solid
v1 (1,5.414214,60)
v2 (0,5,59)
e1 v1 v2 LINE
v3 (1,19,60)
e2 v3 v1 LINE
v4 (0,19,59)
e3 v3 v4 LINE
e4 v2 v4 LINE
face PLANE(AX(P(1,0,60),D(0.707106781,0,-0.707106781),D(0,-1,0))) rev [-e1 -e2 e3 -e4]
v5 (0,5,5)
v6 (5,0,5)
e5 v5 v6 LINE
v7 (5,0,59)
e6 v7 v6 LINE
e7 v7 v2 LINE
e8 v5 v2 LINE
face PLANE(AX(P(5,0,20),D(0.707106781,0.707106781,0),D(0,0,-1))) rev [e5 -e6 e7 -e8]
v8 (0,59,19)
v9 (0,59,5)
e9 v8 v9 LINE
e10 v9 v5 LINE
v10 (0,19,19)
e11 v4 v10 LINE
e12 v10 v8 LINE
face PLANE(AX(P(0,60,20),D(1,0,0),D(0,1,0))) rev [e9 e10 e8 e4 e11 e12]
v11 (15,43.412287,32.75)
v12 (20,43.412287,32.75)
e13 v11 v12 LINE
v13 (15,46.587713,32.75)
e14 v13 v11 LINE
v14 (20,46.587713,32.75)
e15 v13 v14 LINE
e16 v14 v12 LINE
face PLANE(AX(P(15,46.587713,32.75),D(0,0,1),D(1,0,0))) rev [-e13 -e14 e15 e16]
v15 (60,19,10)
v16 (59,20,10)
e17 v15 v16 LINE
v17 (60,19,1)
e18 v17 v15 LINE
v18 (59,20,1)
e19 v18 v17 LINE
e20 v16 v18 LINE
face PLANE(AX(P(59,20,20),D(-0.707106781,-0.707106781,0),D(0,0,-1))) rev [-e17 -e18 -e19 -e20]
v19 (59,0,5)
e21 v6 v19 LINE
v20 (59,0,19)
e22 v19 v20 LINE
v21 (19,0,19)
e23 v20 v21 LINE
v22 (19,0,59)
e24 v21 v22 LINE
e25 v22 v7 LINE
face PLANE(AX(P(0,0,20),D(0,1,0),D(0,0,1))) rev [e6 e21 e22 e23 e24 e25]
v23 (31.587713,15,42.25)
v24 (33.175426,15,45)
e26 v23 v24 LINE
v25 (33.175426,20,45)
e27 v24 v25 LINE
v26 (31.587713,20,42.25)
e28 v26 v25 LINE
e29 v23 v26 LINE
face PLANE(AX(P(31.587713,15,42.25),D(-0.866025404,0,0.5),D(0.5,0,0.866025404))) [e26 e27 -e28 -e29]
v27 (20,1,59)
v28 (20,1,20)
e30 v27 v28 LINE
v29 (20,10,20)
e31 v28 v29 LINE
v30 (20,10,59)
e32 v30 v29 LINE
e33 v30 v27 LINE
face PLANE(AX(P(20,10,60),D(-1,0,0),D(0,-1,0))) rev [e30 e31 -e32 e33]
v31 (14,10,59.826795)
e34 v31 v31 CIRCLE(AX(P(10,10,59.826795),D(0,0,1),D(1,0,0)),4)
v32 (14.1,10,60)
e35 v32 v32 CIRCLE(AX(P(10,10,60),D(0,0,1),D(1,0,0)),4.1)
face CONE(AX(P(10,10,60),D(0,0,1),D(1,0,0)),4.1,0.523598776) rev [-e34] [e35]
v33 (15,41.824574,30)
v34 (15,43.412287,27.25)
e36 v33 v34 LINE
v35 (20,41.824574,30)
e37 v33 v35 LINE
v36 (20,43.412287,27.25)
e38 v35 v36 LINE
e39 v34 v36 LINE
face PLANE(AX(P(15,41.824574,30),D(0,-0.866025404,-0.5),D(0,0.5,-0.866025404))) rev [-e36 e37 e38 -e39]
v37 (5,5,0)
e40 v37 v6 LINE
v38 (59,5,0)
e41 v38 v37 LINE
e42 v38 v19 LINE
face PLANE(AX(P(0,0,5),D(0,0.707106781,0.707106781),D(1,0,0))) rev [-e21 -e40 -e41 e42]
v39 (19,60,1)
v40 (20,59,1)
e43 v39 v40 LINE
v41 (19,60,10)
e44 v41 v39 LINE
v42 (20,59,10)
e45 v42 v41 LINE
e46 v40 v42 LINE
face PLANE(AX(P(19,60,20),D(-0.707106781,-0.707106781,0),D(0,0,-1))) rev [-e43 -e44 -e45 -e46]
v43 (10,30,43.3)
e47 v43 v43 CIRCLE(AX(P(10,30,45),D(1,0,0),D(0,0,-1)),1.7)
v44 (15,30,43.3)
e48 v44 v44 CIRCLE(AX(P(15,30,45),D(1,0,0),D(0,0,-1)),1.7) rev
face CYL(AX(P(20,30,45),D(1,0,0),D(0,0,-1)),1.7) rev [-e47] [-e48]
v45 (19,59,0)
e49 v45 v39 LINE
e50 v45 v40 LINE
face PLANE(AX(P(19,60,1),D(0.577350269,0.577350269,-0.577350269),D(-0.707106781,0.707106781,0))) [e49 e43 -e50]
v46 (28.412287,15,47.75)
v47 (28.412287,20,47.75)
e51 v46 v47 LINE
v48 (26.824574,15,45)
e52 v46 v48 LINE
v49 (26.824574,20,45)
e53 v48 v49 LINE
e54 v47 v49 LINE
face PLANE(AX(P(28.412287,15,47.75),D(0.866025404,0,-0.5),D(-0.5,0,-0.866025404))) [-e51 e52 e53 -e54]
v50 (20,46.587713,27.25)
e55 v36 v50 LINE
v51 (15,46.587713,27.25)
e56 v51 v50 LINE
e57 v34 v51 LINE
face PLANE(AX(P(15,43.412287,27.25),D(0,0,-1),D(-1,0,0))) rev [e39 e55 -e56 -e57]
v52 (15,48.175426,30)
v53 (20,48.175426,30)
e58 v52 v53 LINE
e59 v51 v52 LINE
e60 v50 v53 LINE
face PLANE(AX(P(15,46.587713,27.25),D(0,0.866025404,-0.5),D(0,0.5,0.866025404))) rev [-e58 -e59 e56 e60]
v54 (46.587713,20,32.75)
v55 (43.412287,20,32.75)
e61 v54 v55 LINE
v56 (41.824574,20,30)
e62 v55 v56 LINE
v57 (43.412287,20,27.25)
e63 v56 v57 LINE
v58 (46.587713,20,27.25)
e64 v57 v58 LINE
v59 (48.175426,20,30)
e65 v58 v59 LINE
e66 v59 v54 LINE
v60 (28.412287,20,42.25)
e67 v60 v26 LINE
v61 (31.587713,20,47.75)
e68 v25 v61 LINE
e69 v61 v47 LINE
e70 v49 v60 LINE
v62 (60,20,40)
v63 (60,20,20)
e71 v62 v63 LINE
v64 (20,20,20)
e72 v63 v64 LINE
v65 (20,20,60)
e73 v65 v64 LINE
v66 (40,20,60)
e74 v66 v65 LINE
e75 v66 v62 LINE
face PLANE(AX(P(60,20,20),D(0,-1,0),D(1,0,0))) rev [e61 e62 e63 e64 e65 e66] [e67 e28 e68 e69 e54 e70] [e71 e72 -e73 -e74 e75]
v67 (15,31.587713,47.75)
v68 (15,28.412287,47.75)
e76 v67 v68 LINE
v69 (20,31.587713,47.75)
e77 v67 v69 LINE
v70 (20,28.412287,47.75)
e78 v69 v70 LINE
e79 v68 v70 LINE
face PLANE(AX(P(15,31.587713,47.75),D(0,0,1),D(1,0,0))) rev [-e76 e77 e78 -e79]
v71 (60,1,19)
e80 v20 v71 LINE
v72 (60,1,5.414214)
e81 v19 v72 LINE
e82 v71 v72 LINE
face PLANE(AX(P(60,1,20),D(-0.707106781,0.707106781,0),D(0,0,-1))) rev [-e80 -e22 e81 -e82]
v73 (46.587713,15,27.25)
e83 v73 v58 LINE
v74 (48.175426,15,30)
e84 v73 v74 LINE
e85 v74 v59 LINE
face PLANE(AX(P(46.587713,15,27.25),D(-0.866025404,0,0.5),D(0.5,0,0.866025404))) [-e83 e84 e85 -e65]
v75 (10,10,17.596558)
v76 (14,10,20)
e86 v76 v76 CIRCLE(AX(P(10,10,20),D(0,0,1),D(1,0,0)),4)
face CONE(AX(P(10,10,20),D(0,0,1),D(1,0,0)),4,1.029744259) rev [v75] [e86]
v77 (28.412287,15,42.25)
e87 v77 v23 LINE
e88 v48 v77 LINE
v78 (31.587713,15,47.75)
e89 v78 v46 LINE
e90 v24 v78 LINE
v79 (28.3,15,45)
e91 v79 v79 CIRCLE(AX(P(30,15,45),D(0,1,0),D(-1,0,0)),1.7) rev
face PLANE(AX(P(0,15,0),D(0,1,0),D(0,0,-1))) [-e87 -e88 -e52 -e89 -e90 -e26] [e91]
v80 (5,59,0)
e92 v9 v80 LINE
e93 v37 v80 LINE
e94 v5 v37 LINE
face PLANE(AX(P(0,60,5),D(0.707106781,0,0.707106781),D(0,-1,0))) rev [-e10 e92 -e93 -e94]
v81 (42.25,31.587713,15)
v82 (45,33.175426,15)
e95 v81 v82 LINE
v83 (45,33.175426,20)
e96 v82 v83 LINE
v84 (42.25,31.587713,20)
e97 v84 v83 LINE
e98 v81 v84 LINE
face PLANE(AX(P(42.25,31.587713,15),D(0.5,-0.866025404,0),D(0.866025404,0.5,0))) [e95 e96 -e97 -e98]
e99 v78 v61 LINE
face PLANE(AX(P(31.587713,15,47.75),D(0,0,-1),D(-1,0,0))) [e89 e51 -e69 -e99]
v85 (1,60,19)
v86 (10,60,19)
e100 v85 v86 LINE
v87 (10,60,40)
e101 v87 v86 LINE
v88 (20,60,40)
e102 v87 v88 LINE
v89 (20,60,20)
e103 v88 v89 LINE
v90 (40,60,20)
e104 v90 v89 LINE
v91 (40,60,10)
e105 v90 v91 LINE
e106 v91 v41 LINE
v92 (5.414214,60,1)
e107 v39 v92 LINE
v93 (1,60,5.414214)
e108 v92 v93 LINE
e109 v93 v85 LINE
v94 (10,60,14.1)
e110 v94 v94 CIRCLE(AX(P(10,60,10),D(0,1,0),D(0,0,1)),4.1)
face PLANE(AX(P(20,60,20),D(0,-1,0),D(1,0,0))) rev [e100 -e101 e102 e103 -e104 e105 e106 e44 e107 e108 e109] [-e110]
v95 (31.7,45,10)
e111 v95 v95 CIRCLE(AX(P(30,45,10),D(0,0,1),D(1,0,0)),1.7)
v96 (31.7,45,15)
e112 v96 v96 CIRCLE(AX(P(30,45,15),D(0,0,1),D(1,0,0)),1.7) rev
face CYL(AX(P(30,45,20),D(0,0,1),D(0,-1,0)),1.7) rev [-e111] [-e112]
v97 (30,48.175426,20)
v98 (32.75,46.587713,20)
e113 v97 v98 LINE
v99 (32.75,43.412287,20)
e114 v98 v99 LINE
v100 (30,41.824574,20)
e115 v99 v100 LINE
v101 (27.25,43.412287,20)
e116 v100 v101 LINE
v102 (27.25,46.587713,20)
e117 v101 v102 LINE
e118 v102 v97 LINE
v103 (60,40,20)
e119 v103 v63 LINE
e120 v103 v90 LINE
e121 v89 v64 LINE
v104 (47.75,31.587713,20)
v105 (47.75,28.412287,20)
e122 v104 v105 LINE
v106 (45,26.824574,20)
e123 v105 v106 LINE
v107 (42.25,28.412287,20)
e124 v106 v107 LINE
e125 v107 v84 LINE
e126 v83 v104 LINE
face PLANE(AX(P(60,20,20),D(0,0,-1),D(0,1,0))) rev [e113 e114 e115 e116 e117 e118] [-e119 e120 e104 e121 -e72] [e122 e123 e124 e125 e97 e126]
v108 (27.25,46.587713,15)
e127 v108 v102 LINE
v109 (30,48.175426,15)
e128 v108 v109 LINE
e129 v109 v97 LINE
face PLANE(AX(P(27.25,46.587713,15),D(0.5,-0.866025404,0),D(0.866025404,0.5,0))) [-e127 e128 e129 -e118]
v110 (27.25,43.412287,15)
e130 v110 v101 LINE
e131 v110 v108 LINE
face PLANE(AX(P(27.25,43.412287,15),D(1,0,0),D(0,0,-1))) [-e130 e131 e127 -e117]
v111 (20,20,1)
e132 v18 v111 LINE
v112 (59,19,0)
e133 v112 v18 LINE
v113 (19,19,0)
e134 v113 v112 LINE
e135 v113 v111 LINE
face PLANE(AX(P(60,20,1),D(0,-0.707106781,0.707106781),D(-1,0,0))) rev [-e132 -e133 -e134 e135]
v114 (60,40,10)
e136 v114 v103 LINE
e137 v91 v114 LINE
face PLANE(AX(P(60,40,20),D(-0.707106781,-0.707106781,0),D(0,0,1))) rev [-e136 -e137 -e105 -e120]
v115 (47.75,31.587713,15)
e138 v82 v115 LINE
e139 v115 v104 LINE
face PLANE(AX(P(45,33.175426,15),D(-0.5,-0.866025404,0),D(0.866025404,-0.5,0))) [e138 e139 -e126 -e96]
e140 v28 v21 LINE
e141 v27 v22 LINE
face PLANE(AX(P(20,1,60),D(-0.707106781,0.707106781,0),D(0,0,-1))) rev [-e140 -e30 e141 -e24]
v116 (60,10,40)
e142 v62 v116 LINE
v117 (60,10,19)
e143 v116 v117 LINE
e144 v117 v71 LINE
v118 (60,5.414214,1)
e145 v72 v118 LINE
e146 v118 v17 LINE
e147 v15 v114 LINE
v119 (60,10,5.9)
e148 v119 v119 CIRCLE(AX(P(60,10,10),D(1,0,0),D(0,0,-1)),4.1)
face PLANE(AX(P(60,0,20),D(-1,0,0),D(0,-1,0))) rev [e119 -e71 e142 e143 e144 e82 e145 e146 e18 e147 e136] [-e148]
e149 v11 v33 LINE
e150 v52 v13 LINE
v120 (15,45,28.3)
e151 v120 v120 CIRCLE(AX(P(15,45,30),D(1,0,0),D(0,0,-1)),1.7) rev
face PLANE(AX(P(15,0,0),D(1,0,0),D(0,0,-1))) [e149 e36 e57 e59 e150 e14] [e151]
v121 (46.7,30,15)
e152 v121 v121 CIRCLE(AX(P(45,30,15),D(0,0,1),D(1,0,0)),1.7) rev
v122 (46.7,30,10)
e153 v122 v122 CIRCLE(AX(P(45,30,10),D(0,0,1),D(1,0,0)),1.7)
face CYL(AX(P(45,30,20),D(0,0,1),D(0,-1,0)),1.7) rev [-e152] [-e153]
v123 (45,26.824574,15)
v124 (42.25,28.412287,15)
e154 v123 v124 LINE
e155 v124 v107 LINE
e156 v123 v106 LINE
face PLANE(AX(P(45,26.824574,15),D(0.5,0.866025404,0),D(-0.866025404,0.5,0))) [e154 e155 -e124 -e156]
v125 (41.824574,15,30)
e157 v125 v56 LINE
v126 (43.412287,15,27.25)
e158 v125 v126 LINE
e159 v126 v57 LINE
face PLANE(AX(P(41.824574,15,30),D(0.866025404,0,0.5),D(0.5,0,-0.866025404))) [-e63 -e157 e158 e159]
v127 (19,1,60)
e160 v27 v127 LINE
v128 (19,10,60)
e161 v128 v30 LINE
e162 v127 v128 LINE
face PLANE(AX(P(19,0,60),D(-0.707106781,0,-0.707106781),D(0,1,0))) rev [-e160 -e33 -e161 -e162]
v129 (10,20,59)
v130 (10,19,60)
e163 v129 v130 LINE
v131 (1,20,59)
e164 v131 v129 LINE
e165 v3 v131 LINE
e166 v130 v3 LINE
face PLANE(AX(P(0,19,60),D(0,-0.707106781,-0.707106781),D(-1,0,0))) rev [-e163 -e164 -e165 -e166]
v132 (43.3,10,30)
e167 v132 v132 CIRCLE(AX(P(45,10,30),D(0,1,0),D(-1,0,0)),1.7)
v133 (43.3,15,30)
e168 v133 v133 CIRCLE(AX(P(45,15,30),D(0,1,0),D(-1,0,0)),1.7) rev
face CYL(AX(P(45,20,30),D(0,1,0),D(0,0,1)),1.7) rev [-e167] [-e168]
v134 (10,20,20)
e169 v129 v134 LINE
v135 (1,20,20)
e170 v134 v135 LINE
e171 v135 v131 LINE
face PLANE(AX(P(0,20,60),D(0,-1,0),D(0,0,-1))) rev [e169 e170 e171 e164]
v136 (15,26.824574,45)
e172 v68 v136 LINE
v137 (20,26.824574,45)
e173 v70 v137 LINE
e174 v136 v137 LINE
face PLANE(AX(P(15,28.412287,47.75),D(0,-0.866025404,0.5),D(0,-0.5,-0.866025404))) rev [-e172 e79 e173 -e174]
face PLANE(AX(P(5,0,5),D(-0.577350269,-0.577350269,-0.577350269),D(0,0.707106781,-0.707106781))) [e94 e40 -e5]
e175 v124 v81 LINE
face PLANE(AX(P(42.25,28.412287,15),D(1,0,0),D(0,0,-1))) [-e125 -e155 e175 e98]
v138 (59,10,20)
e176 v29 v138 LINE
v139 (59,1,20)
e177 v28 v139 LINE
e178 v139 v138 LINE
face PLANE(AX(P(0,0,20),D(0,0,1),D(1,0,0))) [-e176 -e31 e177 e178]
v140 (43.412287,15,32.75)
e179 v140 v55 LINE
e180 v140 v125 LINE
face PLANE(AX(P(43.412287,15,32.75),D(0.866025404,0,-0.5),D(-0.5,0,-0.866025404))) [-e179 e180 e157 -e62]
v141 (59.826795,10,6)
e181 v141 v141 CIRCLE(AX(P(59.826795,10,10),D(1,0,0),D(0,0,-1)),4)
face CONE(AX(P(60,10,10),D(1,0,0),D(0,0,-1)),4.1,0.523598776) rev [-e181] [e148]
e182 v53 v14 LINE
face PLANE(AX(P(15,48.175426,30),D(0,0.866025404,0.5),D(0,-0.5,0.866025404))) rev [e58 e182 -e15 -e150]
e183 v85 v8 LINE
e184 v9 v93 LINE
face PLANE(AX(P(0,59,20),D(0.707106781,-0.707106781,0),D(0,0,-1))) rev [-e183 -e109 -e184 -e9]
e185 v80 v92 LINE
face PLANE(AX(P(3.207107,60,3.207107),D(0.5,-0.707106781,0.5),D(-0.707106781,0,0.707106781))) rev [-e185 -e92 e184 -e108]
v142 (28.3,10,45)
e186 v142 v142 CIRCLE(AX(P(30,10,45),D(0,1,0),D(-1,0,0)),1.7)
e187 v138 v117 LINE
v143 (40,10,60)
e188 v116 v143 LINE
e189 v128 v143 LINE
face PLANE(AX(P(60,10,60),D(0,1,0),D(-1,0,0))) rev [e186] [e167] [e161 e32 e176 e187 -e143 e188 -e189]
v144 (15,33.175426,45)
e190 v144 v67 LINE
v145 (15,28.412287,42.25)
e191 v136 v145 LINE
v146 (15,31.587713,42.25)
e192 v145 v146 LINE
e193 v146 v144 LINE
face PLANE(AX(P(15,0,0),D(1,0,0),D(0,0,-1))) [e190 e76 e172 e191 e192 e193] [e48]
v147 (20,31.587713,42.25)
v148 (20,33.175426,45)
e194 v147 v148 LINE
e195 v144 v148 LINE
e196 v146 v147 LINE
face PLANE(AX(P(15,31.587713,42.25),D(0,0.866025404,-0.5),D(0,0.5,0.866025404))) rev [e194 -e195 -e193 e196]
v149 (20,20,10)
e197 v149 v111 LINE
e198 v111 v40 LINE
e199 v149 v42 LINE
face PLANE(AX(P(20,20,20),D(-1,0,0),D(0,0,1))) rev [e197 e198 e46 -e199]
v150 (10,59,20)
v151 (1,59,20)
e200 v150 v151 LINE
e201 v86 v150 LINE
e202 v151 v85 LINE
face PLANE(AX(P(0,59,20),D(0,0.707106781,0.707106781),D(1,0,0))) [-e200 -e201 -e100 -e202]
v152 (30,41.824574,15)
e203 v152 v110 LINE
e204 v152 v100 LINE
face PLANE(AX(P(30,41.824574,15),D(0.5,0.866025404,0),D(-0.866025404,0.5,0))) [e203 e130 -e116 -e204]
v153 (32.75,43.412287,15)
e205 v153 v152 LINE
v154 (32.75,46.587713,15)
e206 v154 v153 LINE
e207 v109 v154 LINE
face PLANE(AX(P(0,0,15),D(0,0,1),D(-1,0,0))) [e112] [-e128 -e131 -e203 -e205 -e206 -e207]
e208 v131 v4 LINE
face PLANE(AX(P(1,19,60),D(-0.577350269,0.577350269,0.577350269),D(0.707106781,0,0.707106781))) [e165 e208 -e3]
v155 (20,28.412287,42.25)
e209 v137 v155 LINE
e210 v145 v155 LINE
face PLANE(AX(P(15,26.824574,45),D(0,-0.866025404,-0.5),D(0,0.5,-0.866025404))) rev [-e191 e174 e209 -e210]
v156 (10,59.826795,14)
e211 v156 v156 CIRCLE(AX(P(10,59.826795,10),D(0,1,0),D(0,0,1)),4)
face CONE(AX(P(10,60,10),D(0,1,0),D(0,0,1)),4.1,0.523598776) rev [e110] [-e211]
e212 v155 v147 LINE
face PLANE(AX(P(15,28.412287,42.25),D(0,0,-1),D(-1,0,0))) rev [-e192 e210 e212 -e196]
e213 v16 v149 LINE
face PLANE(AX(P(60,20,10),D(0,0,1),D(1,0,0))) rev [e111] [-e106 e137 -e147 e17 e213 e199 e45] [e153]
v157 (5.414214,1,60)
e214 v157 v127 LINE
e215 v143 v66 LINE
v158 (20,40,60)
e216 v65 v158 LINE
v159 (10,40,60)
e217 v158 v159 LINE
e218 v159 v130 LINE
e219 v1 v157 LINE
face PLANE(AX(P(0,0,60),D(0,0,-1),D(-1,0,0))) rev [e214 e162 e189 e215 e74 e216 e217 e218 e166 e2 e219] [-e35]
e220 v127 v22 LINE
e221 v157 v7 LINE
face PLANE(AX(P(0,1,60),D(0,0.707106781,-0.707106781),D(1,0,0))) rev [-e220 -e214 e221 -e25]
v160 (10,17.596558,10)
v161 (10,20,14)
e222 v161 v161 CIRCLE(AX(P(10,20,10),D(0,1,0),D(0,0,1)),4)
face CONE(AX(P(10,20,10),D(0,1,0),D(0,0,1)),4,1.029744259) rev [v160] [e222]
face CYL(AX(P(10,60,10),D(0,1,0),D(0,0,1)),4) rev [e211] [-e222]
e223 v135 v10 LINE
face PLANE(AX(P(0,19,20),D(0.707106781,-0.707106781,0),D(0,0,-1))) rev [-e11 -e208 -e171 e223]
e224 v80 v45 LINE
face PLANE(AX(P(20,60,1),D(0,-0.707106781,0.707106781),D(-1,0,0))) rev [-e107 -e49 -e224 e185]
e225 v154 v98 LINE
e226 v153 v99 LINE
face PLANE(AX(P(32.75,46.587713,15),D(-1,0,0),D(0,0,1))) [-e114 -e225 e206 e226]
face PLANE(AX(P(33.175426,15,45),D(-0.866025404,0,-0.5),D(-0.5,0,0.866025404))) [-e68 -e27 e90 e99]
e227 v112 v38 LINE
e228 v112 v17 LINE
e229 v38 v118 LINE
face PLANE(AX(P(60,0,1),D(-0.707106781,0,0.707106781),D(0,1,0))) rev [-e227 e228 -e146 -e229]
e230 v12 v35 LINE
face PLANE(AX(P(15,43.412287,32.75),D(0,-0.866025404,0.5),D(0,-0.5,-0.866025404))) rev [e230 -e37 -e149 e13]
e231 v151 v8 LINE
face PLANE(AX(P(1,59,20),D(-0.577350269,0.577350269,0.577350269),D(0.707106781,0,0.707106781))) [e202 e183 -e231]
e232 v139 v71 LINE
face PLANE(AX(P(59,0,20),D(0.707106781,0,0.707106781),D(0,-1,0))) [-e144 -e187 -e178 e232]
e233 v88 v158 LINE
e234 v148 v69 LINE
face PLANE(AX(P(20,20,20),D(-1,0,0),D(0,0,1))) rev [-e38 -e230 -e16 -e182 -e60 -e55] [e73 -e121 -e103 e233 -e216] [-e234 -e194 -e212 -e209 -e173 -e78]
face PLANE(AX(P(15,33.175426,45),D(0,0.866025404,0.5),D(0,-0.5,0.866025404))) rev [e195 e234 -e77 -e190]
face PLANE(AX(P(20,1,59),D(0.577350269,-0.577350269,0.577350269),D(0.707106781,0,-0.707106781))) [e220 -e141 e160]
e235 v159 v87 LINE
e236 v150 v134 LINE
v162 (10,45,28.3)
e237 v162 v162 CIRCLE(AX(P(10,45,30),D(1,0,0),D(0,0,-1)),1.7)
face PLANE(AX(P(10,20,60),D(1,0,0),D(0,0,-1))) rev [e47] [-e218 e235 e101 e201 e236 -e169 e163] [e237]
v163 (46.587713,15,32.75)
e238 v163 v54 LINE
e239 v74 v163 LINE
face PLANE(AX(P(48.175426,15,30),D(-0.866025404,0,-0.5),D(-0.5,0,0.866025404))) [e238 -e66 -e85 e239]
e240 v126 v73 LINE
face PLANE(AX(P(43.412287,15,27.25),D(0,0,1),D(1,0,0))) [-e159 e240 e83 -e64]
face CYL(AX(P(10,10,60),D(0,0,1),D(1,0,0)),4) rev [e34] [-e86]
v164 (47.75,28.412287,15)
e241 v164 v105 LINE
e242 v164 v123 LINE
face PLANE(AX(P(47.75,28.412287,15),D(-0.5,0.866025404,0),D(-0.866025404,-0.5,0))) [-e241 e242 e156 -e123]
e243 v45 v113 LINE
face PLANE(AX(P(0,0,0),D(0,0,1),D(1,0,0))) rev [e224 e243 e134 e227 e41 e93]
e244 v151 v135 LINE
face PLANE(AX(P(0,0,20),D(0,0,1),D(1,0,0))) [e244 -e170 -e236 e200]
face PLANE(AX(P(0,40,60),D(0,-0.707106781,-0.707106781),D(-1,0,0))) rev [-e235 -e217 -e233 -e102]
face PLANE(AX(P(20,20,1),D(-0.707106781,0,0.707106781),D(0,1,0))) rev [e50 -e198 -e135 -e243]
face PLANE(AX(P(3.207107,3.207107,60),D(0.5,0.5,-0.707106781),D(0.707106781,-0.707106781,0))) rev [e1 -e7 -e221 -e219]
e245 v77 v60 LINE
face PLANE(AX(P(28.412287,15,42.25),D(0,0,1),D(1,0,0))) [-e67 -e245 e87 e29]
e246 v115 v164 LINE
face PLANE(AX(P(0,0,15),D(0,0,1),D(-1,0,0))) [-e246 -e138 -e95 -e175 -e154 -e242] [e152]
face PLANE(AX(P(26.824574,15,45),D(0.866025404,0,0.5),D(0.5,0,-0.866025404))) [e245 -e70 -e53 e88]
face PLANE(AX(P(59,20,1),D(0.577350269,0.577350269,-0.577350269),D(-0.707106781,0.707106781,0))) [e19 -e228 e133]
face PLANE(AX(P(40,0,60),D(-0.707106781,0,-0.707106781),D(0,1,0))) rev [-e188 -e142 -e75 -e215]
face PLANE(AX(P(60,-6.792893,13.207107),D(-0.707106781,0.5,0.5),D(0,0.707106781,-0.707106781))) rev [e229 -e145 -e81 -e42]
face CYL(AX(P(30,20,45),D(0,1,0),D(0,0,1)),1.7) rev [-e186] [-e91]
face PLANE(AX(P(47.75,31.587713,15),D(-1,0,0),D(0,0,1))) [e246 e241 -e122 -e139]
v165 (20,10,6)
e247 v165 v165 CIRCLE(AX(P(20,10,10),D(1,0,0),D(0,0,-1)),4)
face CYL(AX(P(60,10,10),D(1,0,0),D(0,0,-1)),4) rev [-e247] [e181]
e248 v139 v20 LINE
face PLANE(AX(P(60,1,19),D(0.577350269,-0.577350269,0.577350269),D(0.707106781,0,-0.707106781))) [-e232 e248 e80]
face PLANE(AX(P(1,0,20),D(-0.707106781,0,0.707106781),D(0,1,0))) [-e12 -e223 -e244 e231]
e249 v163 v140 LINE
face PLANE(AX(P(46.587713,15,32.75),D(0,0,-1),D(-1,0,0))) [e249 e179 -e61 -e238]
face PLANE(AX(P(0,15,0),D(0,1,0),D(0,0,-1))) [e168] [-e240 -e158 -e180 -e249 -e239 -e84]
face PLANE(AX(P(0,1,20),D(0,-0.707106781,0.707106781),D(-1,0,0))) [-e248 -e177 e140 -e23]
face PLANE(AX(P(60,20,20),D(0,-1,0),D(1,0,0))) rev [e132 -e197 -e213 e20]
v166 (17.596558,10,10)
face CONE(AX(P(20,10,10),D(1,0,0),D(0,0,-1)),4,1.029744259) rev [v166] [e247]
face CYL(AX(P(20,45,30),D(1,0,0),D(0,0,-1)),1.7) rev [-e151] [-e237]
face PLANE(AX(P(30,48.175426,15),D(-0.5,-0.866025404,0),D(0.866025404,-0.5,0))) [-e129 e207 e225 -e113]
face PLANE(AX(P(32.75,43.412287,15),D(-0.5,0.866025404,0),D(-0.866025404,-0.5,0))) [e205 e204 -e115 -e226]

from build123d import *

# Parameters (mm, degrees)
BASE_SHAPE_BASE_DEPTH        = 20
BASE_SHAPE_EXTENSION_DEPTH   = 40
BASE_SHAPE_FINISH_SKETCH_W   = 10
BASE_SHAPE_FINISH_SKETCH_H   = 40
BASE_SHAPE_FINISH_DEPTH      = 40
ROD_HOLE_D8_Z_D              = 8
ROD_HOLE_D8_Z_DEPTH          = 40
ROD_HOLE_D8_Z_CSINK_D        = 8.2
ROD_HOLE_D8_Z_CSINK_ANGLE    = 60
ROD_HOLE_D8_Z_TIP            = 2.403442476
ROD_HOLE_D8_X_D              = 8
ROD_HOLE_D8_X_DEPTH          = 40
ROD_HOLE_D8_X_CSINK_D        = 8.2
ROD_HOLE_D8_X_CSINK_ANGLE    = 60
ROD_HOLE_D8_X_TIP            = 2.403442476
ROD_HOLE_D8_Y_D              = 8
ROD_HOLE_D8_Y_DEPTH          = 40
ROD_HOLE_D8_Y_CSINK_D        = 8.2
ROD_HOLE_D8_Y_CSINK_ANGLE    = 60
ROD_HOLE_D8_Y_TIP            = 2.403442476
OUTER_CHAMFERS_SIZE          = 5
INNER_SMALLER_CHAMFERS_SIZE  = 1
LARGE_CHAMFERS_SIZE          = 20
HULL_PART_HOLES_M3_START     = 10
HULL_PART_HOLES_M3_OUTLINE_R = 1.7
HULL_PART_HOLES_M3_DEPTH     = 10
HULL_PART_NUT_HOLE_DEPTH     = 5


# Read off the part's stored shape, not the designer's step: hull_part_holes_m3
with BuildPart() as part:
    # base_shape_sketch → base_shape_base (new body)
    with BuildSketch(Plane.XY):
        Polygon((0, 0), (60, 0), (60, 20), (20, 20), (20, 60), (0, 60), align=None)
    extrude(amount=BASE_SHAPE_BASE_DEPTH)

    # base_shape_extension_sketch → base_shape_extension (add)
    with BuildSketch(Plane.XY.offset(20)):
        Polygon((20, 60), (20, 20), (60, 20), (60, 10), (20, 10), (20, 0), (0, 0), (0, 20), (10, 20), (10, 60), align=None)
    extrude(amount=BASE_SHAPE_EXTENSION_DEPTH)

    # base_shape_finish_sketch → base_shape_finish (add)
    with BuildSketch(Plane(origin=(20, 0, 0), x_dir=(0, 0, -1), z_dir=(1, 0, 0))):
        with Locations((-15, 40)):
            Rectangle(BASE_SHAPE_FINISH_SKETCH_W, BASE_SHAPE_FINISH_SKETCH_H)
    extrude(amount=BASE_SHAPE_FINISH_DEPTH)

    # rod_hole_d8_z
    with Locations(Plane.XY.offset(60)):
        with Locations((10, 10)):
            CounterSinkHole(ROD_HOLE_D8_Z_D / 2, ROD_HOLE_D8_Z_CSINK_D / 2, depth=ROD_HOLE_D8_Z_DEPTH, counter_sink_angle=ROD_HOLE_D8_Z_CSINK_ANGLE)
            with Locations((0, 0, -(ROD_HOLE_D8_Z_DEPTH + ROD_HOLE_D8_Z_TIP / 2))):  # 118° drill point
                Cone(0, ROD_HOLE_D8_Z_D / 2, ROD_HOLE_D8_Z_TIP, mode=Mode.SUBTRACT)

    # rod_hole_d8_x
    with Locations(Plane(origin=(60, 0, 0), x_dir=(0, 0, -1), z_dir=(1, 0, 0))):
        with Locations((-10, 10)):
            CounterSinkHole(ROD_HOLE_D8_X_D / 2, ROD_HOLE_D8_X_CSINK_D / 2, depth=ROD_HOLE_D8_X_DEPTH, counter_sink_angle=ROD_HOLE_D8_X_CSINK_ANGLE)
            with Locations((0, 0, -(ROD_HOLE_D8_X_DEPTH + ROD_HOLE_D8_X_TIP / 2))):  # 118° drill point
                Cone(0, ROD_HOLE_D8_X_D / 2, ROD_HOLE_D8_X_TIP, mode=Mode.SUBTRACT)

    # rod_hole_d8_y
    with Locations(Plane(origin=(0, 60, 0), x_dir=(1, 0, 0), z_dir=(0, 1, 0))):
        with Locations((10, -10)):
            CounterSinkHole(ROD_HOLE_D8_Y_D / 2, ROD_HOLE_D8_Y_CSINK_D / 2, depth=ROD_HOLE_D8_Y_DEPTH, counter_sink_angle=ROD_HOLE_D8_Y_CSINK_ANGLE)
            with Locations((0, 0, -(ROD_HOLE_D8_Y_DEPTH + ROD_HOLE_D8_Y_TIP / 2))):  # 118° drill point
                Cone(0, ROD_HOLE_D8_Y_D / 2, ROD_HOLE_D8_Y_TIP, mode=Mode.SUBTRACT)

    # outer_chamfers
    outer_chamfers_edges = [part.edges().sort_by_distance(p)[0] for p in [
        (0, 0, 30),
        (30, 0, 0),
        (0, 30, 0),
    ]]
    chamfer(outer_chamfers_edges, length=OUTER_CHAMFERS_SIZE)

    # inner_smaller_chamfers
    inner_smaller_chamfers_edges = [part.edges().sort_by_distance(p)[0] for p in [
        (0, 60, 12.5),
        (60, 0, 12.5),
        (60, 5, 20),
        (40, 0, 20),
        (5, 60, 20),
        (0, 20, 40),
        (20, 0, 40),
        (5, 20, 60),
        (0, 12.5, 60),
        (20, 5, 60),
        (20, 60, 5),
        (0, 40, 20),
        (60, 20, 5),
        (12.5, 60, 0),
        (20, 40, 0),
        (40, 20, 0),
        (12.5, 0, 60),
        (2.5, 2.5, 60),
        (60, 12.5, 0),
        (60, 2.5, 2.5),
        (2.5, 60, 2.5),
    ]]
    chamfer(inner_smaller_chamfers_edges, length=INNER_SMALLER_CHAMFERS_SIZE)

    # large_chamfers
    large_chamfers_edges = [part.edges().sort_by_distance(p)[0] for p in [
        (15, 60, 60),
        (60, 15, 60),
        (60, 60, 15),
    ]]
    chamfer(large_chamfers_edges, length=LARGE_CHAMFERS_SIZE)

    # hull_part_holes_m3 outline → hull_part_holes_m3 (cut)
    with BuildSketch(Plane.YZ.offset(HULL_PART_HOLES_M3_START)):
        with Locations((45, 30)):
            Circle(HULL_PART_HOLES_M3_OUTLINE_R)
        with Locations((30, 45)):
            Circle(HULL_PART_HOLES_M3_OUTLINE_R)
    hull_part_holes_m3 = extrude(amount=HULL_PART_HOLES_M3_DEPTH, mode=Mode.SUBTRACT)

    # Sketch12 → hull_part_nut_hole (cut)
    with BuildSketch(Plane(origin=(20, 0, 0), x_dir=(0, 0, -1), z_dir=(1, 0, 0))):
        Polygon((-30, 48.175426481), (-32.75, 46.58771324), (-32.75, 43.41228676), (-30, 41.824573519), (-27.25, 43.41228676), (-27.25, 46.58771324), align=None)
        Polygon((-45, 33.175426481), (-47.75, 31.58771324), (-47.75, 28.41228676), (-45, 26.824573519), (-42.25, 28.41228676), (-42.25, 31.58771324), align=None)
    hull_part_nut_hole = extrude(amount=-HULL_PART_NUT_HOLE_DEPTH, mode=Mode.SUBTRACT)

    # hull_part_holes_mirror_x: hull_part_holes_m3, hull_part_nut_hole across plane
    add(hull_part_holes_m3.mirror(Plane(origin=(0, 0, 0), x_dir=(0.7071067811865482, 0, 0.7071067811865468), z_dir=(-0.707106781186547, 0, 0.7071067811865481))), mode=Mode.SUBTRACT)
    add(hull_part_nut_hole.mirror(Plane(origin=(0, 0, 0), x_dir=(0.7071067811865482, 0, 0.7071067811865468), z_dir=(-0.707106781186547, 0, 0.7071067811865481))), mode=Mode.SUBTRACT)

    # hull_part_holes_mirror_y: hull_part_holes_m3, hull_part_nut_hole across plane
    add(hull_part_holes_m3.mirror(Plane(origin=(0, 0, 0), x_dir=(0, 0, 1), z_dir=(-0.7071067811865482, 0.7071067811865469, 0))), mode=Mode.SUBTRACT)
    add(hull_part_nut_hole.mirror(Plane(origin=(0, 0, 0), x_dir=(0, 0, 1), z_dir=(-0.7071067811865482, 0.7071067811865469, 0))), mode=Mode.SUBTRACT)


solid = part.part
